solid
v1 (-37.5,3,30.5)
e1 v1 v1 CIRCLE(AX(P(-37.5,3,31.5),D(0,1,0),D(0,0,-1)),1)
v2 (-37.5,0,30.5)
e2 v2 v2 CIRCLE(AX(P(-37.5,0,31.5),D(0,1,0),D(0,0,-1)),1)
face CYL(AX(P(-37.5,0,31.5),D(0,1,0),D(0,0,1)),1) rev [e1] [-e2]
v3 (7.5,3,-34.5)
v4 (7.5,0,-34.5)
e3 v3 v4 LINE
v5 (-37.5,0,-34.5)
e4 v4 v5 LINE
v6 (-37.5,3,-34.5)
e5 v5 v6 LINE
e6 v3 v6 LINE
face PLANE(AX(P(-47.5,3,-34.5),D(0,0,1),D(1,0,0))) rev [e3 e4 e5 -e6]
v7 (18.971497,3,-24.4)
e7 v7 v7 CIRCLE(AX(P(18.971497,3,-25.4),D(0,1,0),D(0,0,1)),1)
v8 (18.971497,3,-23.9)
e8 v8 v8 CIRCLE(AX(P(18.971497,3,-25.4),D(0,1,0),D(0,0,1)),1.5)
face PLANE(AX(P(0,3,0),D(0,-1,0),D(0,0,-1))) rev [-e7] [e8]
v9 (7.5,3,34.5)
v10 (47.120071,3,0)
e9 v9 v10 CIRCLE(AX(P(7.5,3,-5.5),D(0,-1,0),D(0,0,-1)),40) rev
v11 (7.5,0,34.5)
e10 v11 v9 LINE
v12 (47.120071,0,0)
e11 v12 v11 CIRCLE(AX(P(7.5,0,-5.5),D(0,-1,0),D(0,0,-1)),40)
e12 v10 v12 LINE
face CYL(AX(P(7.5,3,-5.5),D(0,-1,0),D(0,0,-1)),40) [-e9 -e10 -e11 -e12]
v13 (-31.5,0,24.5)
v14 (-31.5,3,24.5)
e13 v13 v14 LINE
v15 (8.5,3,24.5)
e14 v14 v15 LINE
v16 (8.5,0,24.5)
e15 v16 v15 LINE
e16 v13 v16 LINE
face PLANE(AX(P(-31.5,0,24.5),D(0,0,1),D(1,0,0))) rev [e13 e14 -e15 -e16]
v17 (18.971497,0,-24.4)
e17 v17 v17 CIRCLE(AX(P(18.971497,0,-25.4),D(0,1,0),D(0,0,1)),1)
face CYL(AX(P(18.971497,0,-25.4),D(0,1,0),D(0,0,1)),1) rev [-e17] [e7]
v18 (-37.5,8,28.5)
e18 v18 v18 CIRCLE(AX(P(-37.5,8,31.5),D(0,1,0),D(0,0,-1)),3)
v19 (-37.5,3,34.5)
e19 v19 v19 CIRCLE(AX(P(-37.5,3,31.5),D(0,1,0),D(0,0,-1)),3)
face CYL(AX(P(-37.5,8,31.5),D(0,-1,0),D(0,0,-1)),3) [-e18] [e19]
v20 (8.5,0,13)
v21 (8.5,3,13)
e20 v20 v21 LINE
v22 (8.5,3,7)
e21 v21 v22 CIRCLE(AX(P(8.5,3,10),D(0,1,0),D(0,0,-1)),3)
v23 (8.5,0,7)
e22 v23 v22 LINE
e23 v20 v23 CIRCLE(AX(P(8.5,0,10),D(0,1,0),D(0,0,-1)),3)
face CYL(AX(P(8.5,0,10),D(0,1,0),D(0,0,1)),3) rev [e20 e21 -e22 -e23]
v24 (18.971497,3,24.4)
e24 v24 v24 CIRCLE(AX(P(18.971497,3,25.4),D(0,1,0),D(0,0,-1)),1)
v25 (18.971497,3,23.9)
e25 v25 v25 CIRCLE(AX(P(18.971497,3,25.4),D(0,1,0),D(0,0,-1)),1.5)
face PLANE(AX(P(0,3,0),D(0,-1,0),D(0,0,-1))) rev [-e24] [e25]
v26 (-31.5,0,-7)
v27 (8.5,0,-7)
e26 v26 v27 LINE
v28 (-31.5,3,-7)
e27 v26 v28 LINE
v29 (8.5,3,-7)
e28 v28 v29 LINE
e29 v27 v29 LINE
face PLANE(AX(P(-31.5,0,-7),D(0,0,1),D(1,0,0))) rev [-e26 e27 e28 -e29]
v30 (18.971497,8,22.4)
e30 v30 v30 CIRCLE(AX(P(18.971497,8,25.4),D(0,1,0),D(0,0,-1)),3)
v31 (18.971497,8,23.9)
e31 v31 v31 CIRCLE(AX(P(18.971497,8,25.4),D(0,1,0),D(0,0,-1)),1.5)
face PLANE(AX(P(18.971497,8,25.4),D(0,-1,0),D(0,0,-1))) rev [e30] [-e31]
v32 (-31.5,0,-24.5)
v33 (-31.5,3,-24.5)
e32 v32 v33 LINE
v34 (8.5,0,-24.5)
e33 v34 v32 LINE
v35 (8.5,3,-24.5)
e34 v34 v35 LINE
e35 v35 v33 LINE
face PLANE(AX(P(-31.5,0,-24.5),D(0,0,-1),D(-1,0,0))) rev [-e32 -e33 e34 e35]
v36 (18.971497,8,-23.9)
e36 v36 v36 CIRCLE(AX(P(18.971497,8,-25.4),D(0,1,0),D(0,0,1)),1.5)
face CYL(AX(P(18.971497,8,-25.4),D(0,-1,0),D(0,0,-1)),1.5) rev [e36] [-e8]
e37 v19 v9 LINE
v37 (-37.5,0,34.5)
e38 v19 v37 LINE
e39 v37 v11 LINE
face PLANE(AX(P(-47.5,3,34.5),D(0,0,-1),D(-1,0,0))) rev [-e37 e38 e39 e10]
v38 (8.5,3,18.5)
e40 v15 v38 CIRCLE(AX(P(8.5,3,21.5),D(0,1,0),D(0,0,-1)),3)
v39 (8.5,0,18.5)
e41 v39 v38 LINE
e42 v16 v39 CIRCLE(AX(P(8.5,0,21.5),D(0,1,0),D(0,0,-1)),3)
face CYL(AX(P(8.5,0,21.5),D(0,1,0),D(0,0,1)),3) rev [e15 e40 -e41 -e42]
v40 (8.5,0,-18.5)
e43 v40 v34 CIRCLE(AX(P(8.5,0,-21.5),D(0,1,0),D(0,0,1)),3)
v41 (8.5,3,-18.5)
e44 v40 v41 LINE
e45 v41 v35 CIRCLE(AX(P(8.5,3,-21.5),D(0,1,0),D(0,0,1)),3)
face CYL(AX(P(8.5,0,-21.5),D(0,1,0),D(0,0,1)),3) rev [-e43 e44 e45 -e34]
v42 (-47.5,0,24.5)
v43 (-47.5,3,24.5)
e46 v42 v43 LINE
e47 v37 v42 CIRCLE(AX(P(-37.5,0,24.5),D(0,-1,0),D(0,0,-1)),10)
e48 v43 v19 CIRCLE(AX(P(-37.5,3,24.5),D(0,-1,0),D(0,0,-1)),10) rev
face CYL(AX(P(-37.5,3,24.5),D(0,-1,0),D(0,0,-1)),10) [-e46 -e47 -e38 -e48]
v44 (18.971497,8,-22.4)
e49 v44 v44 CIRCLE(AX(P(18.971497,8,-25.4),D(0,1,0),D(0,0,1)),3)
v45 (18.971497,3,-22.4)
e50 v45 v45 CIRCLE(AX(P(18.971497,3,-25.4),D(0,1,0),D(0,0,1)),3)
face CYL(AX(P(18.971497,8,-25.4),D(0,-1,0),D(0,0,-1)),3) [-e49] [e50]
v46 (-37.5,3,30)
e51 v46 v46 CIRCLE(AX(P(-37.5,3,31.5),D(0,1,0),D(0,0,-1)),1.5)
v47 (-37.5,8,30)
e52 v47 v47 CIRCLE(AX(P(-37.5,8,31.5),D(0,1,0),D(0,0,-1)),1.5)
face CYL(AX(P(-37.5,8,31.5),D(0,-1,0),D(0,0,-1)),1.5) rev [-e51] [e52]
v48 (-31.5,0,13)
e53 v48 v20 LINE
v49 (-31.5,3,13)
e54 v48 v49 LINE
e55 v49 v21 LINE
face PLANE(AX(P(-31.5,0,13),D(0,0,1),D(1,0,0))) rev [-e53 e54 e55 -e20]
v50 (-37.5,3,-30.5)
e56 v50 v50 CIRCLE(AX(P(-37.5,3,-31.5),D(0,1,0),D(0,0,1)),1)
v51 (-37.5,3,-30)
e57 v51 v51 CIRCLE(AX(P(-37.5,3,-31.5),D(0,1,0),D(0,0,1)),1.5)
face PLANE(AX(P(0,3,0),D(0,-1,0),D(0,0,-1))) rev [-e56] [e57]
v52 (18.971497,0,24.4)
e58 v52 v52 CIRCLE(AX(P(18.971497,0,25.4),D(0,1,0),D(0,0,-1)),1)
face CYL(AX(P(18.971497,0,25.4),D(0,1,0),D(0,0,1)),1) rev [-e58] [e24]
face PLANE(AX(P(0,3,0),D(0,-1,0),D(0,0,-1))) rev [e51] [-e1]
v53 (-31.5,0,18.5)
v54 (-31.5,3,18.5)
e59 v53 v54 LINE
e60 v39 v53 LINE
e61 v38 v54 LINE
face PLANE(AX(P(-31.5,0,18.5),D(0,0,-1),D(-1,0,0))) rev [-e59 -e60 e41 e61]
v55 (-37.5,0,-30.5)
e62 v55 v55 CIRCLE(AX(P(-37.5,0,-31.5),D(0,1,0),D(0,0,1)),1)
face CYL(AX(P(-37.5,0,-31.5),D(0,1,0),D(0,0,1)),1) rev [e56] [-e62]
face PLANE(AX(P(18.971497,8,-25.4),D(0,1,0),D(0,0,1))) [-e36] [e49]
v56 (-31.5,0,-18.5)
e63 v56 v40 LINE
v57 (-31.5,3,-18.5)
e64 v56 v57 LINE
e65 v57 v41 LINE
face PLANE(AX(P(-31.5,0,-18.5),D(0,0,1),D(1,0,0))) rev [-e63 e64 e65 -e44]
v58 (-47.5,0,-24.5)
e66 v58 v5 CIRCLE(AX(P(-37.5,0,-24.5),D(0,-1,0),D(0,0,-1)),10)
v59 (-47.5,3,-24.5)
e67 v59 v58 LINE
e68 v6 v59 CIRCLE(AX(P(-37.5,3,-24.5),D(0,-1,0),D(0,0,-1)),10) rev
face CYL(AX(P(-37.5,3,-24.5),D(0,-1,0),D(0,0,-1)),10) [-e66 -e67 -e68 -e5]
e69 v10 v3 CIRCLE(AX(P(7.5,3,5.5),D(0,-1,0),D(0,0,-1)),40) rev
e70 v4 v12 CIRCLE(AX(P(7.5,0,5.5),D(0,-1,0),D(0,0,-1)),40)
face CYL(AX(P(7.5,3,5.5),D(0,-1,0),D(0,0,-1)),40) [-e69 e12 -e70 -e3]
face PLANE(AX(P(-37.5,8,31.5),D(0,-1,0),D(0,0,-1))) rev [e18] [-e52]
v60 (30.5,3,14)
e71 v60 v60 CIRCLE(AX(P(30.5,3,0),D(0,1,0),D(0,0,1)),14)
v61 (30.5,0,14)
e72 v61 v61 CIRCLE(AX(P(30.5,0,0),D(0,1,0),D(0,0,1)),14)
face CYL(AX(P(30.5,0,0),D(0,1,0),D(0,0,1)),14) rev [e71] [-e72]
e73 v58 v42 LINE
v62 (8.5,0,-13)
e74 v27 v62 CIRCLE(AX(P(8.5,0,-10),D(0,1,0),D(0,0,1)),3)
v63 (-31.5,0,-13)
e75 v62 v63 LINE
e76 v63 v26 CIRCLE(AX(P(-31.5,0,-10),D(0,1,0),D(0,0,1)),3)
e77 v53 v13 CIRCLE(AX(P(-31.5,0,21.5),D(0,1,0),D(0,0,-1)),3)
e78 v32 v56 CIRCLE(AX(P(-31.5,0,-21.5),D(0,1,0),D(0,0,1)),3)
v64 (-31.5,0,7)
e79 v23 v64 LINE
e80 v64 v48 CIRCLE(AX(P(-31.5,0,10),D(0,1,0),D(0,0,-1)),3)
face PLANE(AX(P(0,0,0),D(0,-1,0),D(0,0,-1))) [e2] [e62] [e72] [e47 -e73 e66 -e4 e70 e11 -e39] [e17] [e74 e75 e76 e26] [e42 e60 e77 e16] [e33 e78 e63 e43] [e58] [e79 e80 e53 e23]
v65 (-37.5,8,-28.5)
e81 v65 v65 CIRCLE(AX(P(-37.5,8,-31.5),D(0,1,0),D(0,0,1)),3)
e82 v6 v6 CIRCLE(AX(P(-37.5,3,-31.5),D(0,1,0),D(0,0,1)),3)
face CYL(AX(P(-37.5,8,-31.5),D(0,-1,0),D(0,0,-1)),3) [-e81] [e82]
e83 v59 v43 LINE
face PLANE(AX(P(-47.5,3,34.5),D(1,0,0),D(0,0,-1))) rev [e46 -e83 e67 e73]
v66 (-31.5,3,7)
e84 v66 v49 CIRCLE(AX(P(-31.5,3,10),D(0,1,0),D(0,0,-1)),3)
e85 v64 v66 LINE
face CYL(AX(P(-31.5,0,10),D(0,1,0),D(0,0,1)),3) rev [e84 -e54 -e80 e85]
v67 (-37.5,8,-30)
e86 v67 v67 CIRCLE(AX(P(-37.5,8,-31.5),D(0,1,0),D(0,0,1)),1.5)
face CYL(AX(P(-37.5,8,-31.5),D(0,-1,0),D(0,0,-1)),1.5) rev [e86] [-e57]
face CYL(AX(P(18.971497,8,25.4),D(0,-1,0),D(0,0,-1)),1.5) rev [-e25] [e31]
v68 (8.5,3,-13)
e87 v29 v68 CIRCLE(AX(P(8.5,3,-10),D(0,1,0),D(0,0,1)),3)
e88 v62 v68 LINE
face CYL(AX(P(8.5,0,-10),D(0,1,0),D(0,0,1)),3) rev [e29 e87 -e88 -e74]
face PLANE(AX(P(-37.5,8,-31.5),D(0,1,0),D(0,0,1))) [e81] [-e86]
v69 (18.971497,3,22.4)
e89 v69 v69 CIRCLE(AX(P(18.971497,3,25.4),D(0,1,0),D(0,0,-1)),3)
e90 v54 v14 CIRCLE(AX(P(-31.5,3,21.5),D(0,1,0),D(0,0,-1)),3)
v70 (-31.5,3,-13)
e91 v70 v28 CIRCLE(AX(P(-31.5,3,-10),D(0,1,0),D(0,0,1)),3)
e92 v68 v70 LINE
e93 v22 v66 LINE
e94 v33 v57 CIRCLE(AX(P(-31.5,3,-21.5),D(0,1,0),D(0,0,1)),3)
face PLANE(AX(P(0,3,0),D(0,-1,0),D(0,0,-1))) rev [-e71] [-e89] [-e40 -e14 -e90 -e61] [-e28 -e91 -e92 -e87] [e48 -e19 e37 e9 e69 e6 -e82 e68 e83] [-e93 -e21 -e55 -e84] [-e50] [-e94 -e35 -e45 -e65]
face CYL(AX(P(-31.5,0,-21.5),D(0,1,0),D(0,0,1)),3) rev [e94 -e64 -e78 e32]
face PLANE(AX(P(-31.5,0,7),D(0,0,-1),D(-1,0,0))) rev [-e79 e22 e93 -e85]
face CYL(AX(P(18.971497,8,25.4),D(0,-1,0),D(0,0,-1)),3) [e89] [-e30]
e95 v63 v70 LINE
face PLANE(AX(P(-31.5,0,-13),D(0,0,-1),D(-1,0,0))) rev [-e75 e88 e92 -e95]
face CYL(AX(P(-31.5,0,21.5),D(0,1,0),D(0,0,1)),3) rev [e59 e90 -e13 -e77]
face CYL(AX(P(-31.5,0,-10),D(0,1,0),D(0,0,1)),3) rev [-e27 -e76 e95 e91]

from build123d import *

# Parameters (mm, degrees)
ESBO_O1_W                = 95
ESBO_O1_H                = 69
RESSALTO_EXTRUS_O1_DEPTH = 3
ESBO_O2_R                = 14
CORTE_EXTRUS_O1_DEPTH    = 59.783501087
ESBO_O4_R                = 1
CORTE_EXTRUS_O2_DEPTH    = 59.783501087
ESBO_O5_R                = 3
ESBO_O5_R_2              = 1.5
RESSALTO_EXTRUS_O2_DEPTH = 5
FILETE1_R                = 40
FILETE2_R                = 10
CORTE_EXTRUS_O3_DEPTH    = 59.919436521


with BuildPart() as part:
    # Esboço1 → Ressalto-extrusão1 (new body)
    with BuildSketch(Plane(origin=(0, 0, 0), x_dir=(1, 0, 0), z_dir=(0, 1, 0))):
        Rectangle(ESBO_O1_W, ESBO_O1_H)
    extrude(amount=RESSALTO_EXTRUS_O1_DEPTH)

    # Esboço2 → Corte-extrusão1 (cut, through all)
    with BuildSketch(Plane(origin=(0, 3, 0), x_dir=(1, 0, 0), z_dir=(0, 1, 0))):
        with Locations(Location((30.5, 0, 0), (0, 0, 270))):
            Circle(ESBO_O2_R)
    extrude(amount=-CORTE_EXTRUS_O1_DEPTH, mode=Mode.SUBTRACT)

    # Esboço4 → Corte-extrusão2 (cut, through all)
    with BuildSketch(Plane(origin=(0, 3, 0), x_dir=(1, 0, 0), z_dir=(0, 1, 0))):
        with Locations(Location((18.971497235, 25.4, 0), (0, 0, 270))):
            Circle(ESBO_O4_R)
        with Locations(Location((18.971497235, -25.4, 0), (0, 0, 90))):
            Circle(ESBO_O4_R)
        with Locations(Location((-37.5, 31.5, 0), (0, 0, 270))):
            Circle(ESBO_O4_R)
        with Locations(Location((-37.5, -31.5, 0), (0, 0, 90))):
            Circle(ESBO_O4_R)
    extrude(amount=-CORTE_EXTRUS_O2_DEPTH, mode=Mode.SUBTRACT)

    # Esboço5 → Ressalto-extrusão2 (add)
    # profile 1 of 4: a face of its own
    with BuildSketch(Plane(origin=(0, 3, 0), x_dir=(1, 0, 0), z_dir=(0, 1, 0))):
        with Locations(Location((-37.5, 31.5, 0), (0, 0, 90))):
            Circle(ESBO_O5_R)
        with Locations(Location((-37.5, 31.5, 0), (0, 0, 270))):
            Circle(ESBO_O5_R_2, mode=Mode.SUBTRACT)
    # profile 2 of 4: a face of its own
    with BuildSketch(Plane(origin=(0, 3, 0), x_dir=(1, 0, 0), z_dir=(0, 1, 0))):
        with Locations(Location((18.971497235, 25.4, 0), (0, 0, 270))):
            Circle(ESBO_O5_R)
        with Locations(Location((18.971497235, 25.4, 0), (0, 0, 270))):
            Circle(ESBO_O5_R_2, mode=Mode.SUBTRACT)
    # profile 3 of 4: a face of its own
    with BuildSketch(Plane(origin=(0, 3, 0), x_dir=(1, 0, 0), z_dir=(0, 1, 0))):
        with Locations(Location((18.971497235, -25.4, 0), (0, 0, 90))):
            Circle(ESBO_O5_R)
        with Locations(Location((18.971497235, -25.4, 0), (0, 0, 90))):
            Circle(ESBO_O5_R_2, mode=Mode.SUBTRACT)
    # profile 4 of 4: a face of its own
    with BuildSketch(Plane(origin=(0, 3, 0), x_dir=(1, 0, 0), z_dir=(0, 1, 0))):
        with Locations(Location((-37.5, -31.5, 0), (0, 0, 90))):
            Circle(ESBO_O5_R)
        with Locations(Location((-37.5, -31.5, 0), (0, 0, 90))):
            Circle(ESBO_O5_R_2, mode=Mode.SUBTRACT)
    extrude(amount=RESSALTO_EXTRUS_O2_DEPTH)

    # Filete1
    # the kernel refuses this fillet: 40 mm, written as the material it takes off along each edge
    with BuildSketch(Plane(origin=(47.5, -100, -34.5), x_dir=(0, 0, 1), z_dir=(0, 1, 0)), Plane(origin=(47.5, -100, 34.5), x_dir=(-1, 0, 0), z_dir=(0, 1, 0))) as filete1_piece_1:
        with BuildLine():
            CenterArc((FILETE1_R, -FILETE1_R), FILETE1_R, 90, 90)
            Line((0, -FILETE1_R), (0, 0))
            Line((0, 0), (FILETE1_R, 0))
        make_face()
    extrude(amount=203, mode=Mode.SUBTRACT)

    # Filete2
    filete2_edges = [part.edges().sort_by_distance(p)[0] for p in [
        (-47.5, 1.5, 34.5),
        (-47.5, 1.5, -34.5),
    ]]
    fillet(filete2_edges, radius=FILETE2_R)

    # Esboço7 → Corte-extrusão3 (cut, through all)
    with BuildSketch(Plane(origin=(0, 3, 0), x_dir=(1, 0, 0), z_dir=(0, 1, 0))):
        with BuildLine():
            Line((-31.5, 13), (8.5, 13))
            ThreePointArc((8.5, 13), (11.5, 10), (8.5, 7))
            Line((8.5, 7), (-31.5, 7))
            ThreePointArc((-31.5, 7), (-34.5, 10), (-31.5, 13))
        make_face()
        with BuildLine():
            Line((-31.5, 24.5), (8.5, 24.5))
            ThreePointArc((8.5, 24.5), (11.5, 21.5), (8.5, 18.5))
            Line((8.5, 18.5), (-31.5, 18.5))
            ThreePointArc((-31.5, 18.5), (-34.5, 21.5), (-31.5, 24.5))
        make_face()
        with BuildLine():
            Line((-31.5, -24.5), (8.5, -24.5))
            ThreePointArc((8.5, -24.5), (11.5, -21.5), (8.5, -18.5))
            Line((8.5, -18.5), (-31.5, -18.5))
            ThreePointArc((-31.5, -18.5), (-34.5, -21.5), (-31.5, -24.5))
        make_face()
        with BuildLine():
            Line((-31.5, -13), (8.5, -13))
            ThreePointArc((8.5, -13), (11.5, -10), (8.5, -7))
            Line((8.5, -7), (-31.5, -7))
            ThreePointArc((-31.5, -7), (-34.5, -10), (-31.5, -13))
        make_face()
    extrude(amount=-CORTE_EXTRUS_O3_DEPTH, mode=Mode.SUBTRACT)


solid = part.part
